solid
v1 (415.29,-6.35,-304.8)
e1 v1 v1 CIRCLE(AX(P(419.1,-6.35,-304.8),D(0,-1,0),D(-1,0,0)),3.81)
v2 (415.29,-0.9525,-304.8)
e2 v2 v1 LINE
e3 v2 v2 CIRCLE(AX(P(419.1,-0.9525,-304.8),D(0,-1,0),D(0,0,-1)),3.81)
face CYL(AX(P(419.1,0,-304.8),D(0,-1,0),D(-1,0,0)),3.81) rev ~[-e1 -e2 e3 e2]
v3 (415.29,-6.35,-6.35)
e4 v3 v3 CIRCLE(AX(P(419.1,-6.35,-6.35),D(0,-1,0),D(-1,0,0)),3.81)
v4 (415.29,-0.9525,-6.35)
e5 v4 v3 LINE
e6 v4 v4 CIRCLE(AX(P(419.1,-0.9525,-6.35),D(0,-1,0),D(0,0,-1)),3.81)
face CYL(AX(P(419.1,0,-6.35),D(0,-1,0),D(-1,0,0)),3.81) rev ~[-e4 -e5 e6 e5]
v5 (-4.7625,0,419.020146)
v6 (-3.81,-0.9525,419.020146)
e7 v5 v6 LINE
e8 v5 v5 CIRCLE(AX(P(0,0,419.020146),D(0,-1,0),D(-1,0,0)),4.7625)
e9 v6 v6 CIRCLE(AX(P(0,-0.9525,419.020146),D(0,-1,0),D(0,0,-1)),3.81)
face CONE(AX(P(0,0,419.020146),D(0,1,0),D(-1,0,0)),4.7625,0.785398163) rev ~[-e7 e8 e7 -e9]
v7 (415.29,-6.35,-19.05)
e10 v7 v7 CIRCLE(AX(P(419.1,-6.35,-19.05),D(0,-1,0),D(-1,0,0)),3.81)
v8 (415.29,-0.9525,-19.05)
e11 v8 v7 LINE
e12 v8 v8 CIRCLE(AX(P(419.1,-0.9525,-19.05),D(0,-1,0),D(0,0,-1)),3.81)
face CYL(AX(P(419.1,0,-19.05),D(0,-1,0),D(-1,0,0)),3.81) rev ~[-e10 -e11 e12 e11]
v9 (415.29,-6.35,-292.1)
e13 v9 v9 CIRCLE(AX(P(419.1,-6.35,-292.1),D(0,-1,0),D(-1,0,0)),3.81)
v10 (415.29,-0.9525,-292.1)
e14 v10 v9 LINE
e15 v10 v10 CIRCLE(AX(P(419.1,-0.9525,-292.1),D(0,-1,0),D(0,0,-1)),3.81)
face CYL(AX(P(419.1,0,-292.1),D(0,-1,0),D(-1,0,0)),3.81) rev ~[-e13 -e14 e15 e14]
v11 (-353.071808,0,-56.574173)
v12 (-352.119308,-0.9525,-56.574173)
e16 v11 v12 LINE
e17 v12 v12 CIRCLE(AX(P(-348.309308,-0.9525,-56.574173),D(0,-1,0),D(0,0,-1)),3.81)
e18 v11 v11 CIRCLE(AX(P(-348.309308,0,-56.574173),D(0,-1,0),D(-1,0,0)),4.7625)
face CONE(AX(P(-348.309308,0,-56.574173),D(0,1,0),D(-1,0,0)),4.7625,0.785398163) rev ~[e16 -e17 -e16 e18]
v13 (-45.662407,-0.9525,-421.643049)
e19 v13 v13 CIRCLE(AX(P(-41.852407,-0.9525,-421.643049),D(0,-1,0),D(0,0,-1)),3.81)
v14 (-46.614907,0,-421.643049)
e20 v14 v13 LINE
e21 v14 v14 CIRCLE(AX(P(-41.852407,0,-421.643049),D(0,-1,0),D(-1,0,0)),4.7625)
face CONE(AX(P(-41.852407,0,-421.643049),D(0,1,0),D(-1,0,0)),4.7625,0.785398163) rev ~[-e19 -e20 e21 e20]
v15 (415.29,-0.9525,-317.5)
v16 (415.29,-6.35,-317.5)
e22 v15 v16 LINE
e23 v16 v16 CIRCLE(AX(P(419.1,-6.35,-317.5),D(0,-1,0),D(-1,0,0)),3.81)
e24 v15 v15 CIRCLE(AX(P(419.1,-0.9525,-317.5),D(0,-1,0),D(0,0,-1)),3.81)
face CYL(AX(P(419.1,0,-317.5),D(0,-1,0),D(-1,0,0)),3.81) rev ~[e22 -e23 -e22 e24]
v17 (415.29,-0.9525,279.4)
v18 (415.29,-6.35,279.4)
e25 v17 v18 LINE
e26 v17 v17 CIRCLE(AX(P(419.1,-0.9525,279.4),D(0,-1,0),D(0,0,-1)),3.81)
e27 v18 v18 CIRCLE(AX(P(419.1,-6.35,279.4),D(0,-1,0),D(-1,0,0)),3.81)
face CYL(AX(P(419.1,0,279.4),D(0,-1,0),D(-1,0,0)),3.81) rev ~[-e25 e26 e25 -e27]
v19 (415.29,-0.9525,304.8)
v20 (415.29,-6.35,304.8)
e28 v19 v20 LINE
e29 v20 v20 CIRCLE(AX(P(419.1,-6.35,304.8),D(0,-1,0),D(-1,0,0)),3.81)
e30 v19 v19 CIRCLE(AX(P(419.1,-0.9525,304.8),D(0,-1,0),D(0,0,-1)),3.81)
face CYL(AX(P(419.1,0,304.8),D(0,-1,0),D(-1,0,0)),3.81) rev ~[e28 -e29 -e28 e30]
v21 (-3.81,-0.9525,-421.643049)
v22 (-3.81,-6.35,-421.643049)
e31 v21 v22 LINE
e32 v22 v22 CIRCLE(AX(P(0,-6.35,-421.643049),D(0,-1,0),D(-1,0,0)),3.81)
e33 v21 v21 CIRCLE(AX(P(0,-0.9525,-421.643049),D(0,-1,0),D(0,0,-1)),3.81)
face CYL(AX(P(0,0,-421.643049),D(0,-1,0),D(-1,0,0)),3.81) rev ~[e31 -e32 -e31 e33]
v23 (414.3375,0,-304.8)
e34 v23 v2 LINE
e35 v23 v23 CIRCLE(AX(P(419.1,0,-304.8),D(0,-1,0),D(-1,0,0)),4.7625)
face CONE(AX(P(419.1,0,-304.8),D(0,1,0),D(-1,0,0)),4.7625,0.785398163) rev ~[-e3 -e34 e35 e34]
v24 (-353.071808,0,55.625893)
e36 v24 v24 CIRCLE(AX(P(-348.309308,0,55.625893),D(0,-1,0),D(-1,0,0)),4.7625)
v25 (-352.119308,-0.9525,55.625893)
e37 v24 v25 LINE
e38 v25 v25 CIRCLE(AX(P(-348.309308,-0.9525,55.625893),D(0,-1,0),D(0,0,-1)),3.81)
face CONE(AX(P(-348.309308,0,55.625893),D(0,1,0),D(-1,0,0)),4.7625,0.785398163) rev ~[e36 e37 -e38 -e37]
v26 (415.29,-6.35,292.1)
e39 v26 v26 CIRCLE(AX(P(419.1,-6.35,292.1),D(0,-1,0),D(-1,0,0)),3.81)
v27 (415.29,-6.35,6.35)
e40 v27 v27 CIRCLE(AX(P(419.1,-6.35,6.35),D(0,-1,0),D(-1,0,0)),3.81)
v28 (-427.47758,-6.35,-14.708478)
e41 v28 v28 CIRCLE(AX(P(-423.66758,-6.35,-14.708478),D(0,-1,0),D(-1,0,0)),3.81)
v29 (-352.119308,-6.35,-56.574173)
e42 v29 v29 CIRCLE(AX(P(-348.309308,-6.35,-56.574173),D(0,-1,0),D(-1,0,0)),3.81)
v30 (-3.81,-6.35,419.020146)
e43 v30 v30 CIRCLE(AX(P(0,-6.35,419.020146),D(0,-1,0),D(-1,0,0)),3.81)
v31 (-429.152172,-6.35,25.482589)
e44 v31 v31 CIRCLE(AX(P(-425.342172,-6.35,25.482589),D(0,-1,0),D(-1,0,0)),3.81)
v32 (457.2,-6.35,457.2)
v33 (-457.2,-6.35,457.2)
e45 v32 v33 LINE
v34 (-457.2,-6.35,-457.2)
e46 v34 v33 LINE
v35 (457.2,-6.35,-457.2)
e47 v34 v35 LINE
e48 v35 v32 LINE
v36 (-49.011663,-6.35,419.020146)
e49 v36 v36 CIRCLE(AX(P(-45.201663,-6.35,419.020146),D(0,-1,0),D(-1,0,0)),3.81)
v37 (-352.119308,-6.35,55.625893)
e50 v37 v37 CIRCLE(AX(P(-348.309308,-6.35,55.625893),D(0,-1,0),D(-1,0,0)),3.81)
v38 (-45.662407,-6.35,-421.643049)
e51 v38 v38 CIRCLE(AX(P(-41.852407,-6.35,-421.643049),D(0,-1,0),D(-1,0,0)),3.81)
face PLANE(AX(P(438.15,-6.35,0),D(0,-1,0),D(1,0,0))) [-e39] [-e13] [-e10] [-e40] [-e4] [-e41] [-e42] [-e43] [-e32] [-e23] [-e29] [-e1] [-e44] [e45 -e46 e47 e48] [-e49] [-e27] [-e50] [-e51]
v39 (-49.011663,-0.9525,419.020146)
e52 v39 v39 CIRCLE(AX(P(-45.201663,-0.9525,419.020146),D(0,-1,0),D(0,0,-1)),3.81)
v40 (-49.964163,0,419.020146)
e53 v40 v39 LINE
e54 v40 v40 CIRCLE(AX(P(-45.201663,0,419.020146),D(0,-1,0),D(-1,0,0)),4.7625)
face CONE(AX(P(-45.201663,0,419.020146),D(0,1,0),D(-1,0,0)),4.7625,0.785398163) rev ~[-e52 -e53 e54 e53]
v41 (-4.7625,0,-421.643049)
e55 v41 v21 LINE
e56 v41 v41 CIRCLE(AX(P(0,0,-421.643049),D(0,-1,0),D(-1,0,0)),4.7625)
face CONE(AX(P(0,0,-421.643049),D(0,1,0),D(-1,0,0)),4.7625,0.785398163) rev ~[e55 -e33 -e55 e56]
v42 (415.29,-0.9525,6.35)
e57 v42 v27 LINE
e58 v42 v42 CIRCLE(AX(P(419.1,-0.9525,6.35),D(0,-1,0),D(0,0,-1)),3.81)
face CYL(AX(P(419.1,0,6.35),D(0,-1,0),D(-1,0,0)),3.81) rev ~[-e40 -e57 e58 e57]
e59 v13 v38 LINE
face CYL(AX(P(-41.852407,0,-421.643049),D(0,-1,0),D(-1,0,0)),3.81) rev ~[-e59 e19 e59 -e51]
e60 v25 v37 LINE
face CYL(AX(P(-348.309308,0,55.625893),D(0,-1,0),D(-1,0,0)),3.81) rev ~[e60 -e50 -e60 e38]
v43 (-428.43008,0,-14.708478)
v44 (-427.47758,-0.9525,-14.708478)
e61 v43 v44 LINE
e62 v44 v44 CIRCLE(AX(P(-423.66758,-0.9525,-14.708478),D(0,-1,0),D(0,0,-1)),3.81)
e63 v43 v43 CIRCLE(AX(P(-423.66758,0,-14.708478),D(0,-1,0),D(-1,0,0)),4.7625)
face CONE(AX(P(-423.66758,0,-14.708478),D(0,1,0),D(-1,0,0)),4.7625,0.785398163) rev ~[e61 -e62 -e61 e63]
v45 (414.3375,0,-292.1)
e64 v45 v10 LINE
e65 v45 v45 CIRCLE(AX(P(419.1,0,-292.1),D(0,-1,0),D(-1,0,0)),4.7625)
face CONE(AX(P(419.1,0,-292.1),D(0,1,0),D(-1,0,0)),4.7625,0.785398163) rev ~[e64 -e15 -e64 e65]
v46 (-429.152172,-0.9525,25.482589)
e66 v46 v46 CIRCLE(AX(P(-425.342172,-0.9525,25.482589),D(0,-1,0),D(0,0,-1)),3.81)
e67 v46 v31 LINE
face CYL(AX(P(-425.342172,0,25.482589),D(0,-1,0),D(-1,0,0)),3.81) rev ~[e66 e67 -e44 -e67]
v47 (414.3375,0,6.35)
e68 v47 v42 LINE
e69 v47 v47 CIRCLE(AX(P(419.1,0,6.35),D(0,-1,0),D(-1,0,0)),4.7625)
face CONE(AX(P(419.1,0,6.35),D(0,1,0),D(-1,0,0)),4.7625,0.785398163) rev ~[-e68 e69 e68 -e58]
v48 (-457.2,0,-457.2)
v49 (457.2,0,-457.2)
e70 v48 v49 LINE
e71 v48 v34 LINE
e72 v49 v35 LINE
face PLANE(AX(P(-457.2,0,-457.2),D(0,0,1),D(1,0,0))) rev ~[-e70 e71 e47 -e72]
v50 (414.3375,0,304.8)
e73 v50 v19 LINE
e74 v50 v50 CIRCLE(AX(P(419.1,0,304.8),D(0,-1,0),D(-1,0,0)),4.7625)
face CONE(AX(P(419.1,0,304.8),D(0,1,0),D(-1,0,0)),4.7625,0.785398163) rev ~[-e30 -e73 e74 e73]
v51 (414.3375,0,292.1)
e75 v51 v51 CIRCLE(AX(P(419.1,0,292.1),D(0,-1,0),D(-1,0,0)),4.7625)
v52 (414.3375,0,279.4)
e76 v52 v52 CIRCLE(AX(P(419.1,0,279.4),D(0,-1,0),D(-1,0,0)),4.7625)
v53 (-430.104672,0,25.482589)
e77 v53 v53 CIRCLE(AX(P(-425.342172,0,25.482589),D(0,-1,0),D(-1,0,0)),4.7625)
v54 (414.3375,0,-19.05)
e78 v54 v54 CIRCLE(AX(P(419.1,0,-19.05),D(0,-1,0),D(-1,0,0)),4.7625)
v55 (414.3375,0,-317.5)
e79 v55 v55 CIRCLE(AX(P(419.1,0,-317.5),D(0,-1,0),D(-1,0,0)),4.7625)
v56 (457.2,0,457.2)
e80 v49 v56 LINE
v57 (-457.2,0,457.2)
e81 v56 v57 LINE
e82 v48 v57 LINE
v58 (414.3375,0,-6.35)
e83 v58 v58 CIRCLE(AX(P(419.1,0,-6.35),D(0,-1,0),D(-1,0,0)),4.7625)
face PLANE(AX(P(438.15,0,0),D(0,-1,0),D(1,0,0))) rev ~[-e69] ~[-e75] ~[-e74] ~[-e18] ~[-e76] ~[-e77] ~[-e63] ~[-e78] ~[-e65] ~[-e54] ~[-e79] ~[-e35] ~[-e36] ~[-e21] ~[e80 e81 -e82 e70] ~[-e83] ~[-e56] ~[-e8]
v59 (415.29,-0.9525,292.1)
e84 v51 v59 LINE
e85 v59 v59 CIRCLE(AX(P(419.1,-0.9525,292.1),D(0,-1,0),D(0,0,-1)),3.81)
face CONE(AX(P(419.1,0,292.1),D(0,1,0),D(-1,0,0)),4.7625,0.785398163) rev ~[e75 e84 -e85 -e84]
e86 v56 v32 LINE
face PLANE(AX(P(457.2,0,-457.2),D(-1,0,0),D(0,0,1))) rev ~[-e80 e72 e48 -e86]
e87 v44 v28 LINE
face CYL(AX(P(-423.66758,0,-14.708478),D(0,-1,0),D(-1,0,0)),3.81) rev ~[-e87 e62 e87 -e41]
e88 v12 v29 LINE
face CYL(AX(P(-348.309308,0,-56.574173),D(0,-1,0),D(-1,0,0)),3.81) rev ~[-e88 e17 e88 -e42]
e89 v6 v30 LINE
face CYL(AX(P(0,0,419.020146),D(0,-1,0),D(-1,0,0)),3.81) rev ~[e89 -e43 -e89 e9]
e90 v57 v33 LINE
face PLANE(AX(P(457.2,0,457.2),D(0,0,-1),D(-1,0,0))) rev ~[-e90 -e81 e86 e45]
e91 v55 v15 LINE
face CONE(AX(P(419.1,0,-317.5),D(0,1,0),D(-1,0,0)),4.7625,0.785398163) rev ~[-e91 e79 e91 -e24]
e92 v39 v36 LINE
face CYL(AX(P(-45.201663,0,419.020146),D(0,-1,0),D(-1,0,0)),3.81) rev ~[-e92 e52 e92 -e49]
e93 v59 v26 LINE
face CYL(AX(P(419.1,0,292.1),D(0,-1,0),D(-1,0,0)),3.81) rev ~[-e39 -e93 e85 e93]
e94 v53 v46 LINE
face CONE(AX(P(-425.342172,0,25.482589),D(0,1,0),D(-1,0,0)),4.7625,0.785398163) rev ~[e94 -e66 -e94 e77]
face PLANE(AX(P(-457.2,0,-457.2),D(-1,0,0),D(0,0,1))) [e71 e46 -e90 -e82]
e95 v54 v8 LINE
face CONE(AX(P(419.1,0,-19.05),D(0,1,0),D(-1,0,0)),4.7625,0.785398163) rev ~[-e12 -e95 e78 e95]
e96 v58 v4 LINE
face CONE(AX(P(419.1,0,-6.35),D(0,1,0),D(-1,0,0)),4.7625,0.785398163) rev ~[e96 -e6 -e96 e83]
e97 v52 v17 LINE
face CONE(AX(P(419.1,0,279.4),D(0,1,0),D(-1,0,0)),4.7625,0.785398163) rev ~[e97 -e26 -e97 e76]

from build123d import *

# Parameters (mm, degrees)
F0_W           = 38.1
F0_H           = 914.4
F0_W_2         = 876.3
F1_DEPTH       = 6.35
F2_D           = 7.62
F2_CSINK_D     = 9.525
F2_CSINK_ANGLE = 90


# Not quite as in the source:
# - a feature names something its author has since deleted; it is built from what else it names


with BuildPart() as f1:
    # F0 (on Front) → F1 (new body)
    with BuildSketch(Plane.XZ):
        with Locations((438.15, 0)):
            Rectangle(F0_W, F0_H)
        with Locations((-19.05, 0)):
            Rectangle(F0_W_2, F0_H)
    extrude(amount=F1_DEPTH)

    # F2 (through all)
    with Locations(Plane(origin=(0, 0, 0), x_dir=(1, 0, 0), z_dir=(0, 1, 0))):
        with Locations((419.1, -304.8), (419.1, -292.1), (419.1, -279.4), (419.1, -6.35), (419.1, 19.05), (419.1, 317.5), (419.1, 304.8), (419.1, 292.1), (419.1, 6.35), (-348.3093082905, -55.6258931756), (-348.3093082905, 56.5741732717), (-423.6675798893, 14.7084780037), (-425.3421723843, -25.482589379), (-45.2016629279, -419.0201461315), (0, -419.0201461315), (-41.8524071574, 421.6430485249), (0, 421.6430485249)):
            CounterSinkHole(F2_D / 2, F2_CSINK_D / 2, counter_sink_angle=F2_CSINK_ANGLE)


solid = f1.part
